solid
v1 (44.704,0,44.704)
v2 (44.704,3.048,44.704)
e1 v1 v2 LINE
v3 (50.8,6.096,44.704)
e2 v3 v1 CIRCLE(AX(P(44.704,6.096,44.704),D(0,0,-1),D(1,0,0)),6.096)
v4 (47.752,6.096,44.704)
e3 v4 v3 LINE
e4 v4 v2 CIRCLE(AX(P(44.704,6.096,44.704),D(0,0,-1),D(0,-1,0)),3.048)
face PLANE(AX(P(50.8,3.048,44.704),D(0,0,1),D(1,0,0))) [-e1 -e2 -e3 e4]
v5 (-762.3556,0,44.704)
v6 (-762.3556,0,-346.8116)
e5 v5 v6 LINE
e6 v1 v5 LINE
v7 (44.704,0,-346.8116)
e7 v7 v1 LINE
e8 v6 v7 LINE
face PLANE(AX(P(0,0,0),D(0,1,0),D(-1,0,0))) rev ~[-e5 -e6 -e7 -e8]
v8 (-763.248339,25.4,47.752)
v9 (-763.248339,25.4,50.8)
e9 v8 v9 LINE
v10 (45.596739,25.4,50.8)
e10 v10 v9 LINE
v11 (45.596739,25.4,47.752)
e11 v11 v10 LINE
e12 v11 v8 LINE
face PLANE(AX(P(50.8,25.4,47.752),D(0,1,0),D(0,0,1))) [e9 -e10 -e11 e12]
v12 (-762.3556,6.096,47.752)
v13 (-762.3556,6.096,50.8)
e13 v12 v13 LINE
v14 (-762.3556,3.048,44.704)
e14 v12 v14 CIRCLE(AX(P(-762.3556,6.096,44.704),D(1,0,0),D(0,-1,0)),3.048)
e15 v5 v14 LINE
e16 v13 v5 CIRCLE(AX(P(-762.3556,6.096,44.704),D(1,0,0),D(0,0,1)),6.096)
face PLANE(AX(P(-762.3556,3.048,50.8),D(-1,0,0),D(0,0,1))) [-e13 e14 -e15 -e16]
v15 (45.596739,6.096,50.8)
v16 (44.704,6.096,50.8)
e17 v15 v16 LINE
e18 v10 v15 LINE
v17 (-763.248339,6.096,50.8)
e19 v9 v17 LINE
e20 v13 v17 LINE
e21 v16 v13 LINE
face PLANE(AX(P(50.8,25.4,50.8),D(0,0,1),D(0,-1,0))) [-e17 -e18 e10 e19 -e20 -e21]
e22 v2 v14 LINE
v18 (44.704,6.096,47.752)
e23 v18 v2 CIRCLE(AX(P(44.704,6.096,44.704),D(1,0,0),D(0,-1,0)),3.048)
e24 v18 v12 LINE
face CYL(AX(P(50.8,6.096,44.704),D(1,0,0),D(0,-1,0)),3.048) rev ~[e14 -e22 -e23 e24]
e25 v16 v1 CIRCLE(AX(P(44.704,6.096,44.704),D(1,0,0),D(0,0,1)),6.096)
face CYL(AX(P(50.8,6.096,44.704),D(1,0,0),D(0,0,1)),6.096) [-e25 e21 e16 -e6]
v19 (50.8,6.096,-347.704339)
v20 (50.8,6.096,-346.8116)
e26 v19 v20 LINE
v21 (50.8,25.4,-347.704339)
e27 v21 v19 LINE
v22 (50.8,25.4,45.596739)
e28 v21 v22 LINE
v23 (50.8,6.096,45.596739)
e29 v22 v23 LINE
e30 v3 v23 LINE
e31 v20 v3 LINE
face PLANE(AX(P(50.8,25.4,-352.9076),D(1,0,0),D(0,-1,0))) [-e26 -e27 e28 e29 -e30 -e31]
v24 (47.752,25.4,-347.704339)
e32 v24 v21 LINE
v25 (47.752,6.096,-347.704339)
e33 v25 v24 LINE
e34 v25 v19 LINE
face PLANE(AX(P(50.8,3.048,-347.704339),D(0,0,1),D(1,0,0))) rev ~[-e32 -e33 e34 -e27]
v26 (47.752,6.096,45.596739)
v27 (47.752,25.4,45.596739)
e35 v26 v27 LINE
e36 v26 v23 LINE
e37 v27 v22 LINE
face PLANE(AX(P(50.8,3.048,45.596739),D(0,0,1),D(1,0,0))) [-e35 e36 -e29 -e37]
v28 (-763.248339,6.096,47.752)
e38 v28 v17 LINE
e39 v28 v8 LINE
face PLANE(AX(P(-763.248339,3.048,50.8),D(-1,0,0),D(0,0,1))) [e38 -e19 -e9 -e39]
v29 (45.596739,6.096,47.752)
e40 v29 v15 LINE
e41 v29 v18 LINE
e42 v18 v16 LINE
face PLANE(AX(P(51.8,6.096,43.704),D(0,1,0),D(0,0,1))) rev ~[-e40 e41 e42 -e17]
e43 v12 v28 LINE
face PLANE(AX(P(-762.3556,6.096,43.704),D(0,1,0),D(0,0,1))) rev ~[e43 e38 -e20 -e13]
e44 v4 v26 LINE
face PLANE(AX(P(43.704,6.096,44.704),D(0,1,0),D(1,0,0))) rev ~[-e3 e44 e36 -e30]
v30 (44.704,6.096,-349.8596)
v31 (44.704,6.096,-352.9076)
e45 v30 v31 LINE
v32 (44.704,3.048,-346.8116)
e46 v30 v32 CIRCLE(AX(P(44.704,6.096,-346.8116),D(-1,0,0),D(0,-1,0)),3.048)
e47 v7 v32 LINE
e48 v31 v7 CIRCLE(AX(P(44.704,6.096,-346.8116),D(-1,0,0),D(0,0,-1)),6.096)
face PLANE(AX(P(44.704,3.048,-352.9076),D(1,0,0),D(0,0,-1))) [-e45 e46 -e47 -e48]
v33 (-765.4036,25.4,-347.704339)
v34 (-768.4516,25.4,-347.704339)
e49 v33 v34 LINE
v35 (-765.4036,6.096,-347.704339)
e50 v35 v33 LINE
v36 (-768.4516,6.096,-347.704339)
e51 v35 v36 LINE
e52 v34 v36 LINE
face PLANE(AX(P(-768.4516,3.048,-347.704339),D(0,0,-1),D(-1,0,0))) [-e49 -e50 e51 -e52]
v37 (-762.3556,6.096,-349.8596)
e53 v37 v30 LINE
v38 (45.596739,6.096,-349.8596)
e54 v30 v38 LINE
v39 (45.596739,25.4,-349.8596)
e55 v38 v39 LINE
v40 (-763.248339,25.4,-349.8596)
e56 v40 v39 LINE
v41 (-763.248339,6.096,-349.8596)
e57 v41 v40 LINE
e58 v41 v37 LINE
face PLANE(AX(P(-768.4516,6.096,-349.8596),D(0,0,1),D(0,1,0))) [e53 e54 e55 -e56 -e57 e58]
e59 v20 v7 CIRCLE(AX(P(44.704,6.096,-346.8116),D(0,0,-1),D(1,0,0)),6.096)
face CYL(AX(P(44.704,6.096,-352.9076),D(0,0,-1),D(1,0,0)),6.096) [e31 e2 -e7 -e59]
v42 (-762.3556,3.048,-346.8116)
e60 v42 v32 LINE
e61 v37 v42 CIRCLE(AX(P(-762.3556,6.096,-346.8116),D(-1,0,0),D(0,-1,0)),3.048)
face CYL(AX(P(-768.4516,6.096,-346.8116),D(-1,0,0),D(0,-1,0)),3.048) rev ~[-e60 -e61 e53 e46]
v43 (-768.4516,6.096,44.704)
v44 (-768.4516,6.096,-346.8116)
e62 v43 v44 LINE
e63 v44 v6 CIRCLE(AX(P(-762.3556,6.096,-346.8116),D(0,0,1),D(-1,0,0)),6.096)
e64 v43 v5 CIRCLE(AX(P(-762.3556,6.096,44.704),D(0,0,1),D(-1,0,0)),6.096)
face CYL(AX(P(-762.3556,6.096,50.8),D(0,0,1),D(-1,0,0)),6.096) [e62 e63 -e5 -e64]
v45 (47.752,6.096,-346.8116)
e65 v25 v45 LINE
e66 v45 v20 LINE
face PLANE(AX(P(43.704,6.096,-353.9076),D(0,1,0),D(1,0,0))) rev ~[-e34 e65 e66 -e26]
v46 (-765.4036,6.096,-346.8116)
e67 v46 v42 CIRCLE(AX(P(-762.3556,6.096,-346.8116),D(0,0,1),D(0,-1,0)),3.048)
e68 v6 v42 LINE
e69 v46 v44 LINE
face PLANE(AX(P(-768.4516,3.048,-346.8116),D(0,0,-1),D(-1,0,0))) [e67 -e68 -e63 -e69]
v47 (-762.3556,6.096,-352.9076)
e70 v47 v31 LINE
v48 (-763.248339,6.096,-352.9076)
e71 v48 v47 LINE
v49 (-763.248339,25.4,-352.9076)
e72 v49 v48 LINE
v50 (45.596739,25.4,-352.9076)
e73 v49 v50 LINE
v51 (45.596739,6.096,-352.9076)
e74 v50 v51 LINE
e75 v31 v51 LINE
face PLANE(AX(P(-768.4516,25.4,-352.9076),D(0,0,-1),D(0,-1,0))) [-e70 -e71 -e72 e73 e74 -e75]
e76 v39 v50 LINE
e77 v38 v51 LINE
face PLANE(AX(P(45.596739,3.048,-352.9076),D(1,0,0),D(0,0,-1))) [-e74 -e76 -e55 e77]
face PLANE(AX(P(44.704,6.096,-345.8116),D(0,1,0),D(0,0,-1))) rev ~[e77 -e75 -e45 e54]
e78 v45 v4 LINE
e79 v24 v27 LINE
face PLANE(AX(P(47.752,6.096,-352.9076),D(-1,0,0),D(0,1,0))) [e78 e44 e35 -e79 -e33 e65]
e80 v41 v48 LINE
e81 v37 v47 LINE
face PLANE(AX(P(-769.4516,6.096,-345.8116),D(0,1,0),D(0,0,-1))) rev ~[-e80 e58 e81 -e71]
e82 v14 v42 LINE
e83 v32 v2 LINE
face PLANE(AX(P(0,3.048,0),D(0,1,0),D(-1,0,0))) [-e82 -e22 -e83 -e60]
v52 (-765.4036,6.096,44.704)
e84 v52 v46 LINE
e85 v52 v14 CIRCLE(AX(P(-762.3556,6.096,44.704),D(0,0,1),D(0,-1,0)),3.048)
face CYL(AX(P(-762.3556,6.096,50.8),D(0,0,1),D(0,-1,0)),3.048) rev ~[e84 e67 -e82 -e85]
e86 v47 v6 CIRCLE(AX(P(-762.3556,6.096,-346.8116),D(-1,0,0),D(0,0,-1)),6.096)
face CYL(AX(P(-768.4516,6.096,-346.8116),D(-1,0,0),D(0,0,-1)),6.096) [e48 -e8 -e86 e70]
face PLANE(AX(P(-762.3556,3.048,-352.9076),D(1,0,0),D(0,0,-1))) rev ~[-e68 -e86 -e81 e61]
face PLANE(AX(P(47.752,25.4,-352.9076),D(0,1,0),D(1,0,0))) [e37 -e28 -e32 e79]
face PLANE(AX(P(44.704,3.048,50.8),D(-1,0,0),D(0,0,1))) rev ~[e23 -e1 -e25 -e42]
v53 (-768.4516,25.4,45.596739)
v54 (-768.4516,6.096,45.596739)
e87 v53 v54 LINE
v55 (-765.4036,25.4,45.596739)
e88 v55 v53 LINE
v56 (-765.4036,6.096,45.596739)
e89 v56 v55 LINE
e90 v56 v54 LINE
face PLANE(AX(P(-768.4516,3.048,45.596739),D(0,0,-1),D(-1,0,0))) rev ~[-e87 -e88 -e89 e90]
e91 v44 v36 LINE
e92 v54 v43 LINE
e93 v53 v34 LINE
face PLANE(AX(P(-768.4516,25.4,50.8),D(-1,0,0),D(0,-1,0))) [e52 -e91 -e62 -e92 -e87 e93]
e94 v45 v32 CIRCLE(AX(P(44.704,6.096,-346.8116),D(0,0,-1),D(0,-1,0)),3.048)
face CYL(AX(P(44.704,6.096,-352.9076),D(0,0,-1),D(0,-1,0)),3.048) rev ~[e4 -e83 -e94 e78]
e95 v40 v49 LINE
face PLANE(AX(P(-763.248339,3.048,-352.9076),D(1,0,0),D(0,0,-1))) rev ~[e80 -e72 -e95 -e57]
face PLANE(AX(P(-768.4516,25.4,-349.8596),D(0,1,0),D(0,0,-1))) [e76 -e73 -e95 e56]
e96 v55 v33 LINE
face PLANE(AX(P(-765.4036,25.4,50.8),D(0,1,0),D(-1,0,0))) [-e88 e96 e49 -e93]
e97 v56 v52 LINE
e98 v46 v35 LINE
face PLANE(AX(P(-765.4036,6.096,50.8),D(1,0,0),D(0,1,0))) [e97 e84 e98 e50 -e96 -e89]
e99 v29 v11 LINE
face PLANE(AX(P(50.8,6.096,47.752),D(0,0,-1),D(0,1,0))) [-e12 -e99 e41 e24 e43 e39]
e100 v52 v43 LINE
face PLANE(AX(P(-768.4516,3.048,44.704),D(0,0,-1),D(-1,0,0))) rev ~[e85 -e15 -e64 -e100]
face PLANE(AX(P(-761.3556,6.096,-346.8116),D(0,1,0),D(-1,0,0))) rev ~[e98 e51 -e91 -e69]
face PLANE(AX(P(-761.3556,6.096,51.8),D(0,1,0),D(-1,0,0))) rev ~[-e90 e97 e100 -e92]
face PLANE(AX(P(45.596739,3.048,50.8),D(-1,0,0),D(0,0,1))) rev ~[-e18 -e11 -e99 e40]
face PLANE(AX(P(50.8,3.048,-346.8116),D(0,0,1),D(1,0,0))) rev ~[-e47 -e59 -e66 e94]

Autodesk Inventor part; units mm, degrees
ref_plane "YZ Plane" through (0, 0, 0) normal (1, 0, 0) x (0, 1, 0)
ref_plane "XZ Plane" through (0, 0, 0) normal (0, 1, 0) x (-1, 0, 0)
ref_plane "XY Plane" through (0, 0, 0) normal (0, 0, 1) x (1, 0, 0)
sketch "Sketch1" plane through (0, 0, 0) normal (0, 1, 0) x (-1, 0, 0)
  line L0 (-50.8, 50.8) -> (768.4516, 50.8)
  line L1 (768.4516, 50.8) -> (768.4516, -352.9076)
  line L2 (768.4516, -352.9076) -> (-50.8, -352.9076)
  line L3 (-50.8, -352.9076) -> (-50.8, 50.8)
  dimension "d48" = 819.2516
  dimension "d49" = 403.7076
extrude "Plate1" add sketch "Sketch1" along normal blind 3.048
sketch "Sketch2" plane through (-768.4516, 0, -349.8596) normal (0, 0, -1) x (-1, 0, 0)
  line L0 (-819.2516, 0) -> (0, 0)
  line L1 (0, 0) -> (0, 25.4)
  line L2 (0, 25.4) -> (-819.2516, 25.4)
  line L3 (-819.2516, 25.4) -> (-819.2516, 0)
edge flange "Flange1" height 25.4 angle 90 thickness 3.048 bend radius 3.048 thickness toward (0, 0, -1) relief tear relief width 3.048 relief depth 1.524 corner gap 3.048 corner form 2 edges at (-358.8258, 3.048, -352.9076) (-768.4516, 3.048, -151.0538) (-358.8258, 3.048, 50.8) (50.8, 3.048, -151.0538) wall of the first edge with corners at (50.8, 0, -349.8596) (-768.4516, 0, -349.8596) (-768.4516, 25.4, -349.8596) (50.8, 25.4, -349.8596)
bend "Bend1"
corner "Corner1"
equation "\"d50\" = BendReliefWidth"
equation "\"d51\" = BendReliefDepth"
equation "\"d52\" = MinimumRemnant"
equation "\"d53\" = BendRadius"
equation "\"d56\" = BendRadius"
equation "\"d57\" = CornerReliefSize"
equation "\"d58\" = GapSize"
equation "\"d59\" = JacobiRadiusSize"
equation "\"BendRadius\" = Thickness"
equation "\"BendReliefWidth\" = Thickness"
equation "\"BendReliefDepth\" = 0.5 * Thickness"
equation "\"CornerReliefSize\" = 4 * Thickness"
equation "\"MinimumRemnant\" = 2 * Thickness"
equation "\"TransitionRadius\" = BendRadius"
equation "\"JacobiRadiusSize\" = BendRadius"
equation "\"GapSize\" = Thickness"
equation "\"d47\" = BendRadius"
equation "\"Thickness\" = 3.048"
properties part number "BellyPan Lexan" material "Polycarbonate, Clear"
